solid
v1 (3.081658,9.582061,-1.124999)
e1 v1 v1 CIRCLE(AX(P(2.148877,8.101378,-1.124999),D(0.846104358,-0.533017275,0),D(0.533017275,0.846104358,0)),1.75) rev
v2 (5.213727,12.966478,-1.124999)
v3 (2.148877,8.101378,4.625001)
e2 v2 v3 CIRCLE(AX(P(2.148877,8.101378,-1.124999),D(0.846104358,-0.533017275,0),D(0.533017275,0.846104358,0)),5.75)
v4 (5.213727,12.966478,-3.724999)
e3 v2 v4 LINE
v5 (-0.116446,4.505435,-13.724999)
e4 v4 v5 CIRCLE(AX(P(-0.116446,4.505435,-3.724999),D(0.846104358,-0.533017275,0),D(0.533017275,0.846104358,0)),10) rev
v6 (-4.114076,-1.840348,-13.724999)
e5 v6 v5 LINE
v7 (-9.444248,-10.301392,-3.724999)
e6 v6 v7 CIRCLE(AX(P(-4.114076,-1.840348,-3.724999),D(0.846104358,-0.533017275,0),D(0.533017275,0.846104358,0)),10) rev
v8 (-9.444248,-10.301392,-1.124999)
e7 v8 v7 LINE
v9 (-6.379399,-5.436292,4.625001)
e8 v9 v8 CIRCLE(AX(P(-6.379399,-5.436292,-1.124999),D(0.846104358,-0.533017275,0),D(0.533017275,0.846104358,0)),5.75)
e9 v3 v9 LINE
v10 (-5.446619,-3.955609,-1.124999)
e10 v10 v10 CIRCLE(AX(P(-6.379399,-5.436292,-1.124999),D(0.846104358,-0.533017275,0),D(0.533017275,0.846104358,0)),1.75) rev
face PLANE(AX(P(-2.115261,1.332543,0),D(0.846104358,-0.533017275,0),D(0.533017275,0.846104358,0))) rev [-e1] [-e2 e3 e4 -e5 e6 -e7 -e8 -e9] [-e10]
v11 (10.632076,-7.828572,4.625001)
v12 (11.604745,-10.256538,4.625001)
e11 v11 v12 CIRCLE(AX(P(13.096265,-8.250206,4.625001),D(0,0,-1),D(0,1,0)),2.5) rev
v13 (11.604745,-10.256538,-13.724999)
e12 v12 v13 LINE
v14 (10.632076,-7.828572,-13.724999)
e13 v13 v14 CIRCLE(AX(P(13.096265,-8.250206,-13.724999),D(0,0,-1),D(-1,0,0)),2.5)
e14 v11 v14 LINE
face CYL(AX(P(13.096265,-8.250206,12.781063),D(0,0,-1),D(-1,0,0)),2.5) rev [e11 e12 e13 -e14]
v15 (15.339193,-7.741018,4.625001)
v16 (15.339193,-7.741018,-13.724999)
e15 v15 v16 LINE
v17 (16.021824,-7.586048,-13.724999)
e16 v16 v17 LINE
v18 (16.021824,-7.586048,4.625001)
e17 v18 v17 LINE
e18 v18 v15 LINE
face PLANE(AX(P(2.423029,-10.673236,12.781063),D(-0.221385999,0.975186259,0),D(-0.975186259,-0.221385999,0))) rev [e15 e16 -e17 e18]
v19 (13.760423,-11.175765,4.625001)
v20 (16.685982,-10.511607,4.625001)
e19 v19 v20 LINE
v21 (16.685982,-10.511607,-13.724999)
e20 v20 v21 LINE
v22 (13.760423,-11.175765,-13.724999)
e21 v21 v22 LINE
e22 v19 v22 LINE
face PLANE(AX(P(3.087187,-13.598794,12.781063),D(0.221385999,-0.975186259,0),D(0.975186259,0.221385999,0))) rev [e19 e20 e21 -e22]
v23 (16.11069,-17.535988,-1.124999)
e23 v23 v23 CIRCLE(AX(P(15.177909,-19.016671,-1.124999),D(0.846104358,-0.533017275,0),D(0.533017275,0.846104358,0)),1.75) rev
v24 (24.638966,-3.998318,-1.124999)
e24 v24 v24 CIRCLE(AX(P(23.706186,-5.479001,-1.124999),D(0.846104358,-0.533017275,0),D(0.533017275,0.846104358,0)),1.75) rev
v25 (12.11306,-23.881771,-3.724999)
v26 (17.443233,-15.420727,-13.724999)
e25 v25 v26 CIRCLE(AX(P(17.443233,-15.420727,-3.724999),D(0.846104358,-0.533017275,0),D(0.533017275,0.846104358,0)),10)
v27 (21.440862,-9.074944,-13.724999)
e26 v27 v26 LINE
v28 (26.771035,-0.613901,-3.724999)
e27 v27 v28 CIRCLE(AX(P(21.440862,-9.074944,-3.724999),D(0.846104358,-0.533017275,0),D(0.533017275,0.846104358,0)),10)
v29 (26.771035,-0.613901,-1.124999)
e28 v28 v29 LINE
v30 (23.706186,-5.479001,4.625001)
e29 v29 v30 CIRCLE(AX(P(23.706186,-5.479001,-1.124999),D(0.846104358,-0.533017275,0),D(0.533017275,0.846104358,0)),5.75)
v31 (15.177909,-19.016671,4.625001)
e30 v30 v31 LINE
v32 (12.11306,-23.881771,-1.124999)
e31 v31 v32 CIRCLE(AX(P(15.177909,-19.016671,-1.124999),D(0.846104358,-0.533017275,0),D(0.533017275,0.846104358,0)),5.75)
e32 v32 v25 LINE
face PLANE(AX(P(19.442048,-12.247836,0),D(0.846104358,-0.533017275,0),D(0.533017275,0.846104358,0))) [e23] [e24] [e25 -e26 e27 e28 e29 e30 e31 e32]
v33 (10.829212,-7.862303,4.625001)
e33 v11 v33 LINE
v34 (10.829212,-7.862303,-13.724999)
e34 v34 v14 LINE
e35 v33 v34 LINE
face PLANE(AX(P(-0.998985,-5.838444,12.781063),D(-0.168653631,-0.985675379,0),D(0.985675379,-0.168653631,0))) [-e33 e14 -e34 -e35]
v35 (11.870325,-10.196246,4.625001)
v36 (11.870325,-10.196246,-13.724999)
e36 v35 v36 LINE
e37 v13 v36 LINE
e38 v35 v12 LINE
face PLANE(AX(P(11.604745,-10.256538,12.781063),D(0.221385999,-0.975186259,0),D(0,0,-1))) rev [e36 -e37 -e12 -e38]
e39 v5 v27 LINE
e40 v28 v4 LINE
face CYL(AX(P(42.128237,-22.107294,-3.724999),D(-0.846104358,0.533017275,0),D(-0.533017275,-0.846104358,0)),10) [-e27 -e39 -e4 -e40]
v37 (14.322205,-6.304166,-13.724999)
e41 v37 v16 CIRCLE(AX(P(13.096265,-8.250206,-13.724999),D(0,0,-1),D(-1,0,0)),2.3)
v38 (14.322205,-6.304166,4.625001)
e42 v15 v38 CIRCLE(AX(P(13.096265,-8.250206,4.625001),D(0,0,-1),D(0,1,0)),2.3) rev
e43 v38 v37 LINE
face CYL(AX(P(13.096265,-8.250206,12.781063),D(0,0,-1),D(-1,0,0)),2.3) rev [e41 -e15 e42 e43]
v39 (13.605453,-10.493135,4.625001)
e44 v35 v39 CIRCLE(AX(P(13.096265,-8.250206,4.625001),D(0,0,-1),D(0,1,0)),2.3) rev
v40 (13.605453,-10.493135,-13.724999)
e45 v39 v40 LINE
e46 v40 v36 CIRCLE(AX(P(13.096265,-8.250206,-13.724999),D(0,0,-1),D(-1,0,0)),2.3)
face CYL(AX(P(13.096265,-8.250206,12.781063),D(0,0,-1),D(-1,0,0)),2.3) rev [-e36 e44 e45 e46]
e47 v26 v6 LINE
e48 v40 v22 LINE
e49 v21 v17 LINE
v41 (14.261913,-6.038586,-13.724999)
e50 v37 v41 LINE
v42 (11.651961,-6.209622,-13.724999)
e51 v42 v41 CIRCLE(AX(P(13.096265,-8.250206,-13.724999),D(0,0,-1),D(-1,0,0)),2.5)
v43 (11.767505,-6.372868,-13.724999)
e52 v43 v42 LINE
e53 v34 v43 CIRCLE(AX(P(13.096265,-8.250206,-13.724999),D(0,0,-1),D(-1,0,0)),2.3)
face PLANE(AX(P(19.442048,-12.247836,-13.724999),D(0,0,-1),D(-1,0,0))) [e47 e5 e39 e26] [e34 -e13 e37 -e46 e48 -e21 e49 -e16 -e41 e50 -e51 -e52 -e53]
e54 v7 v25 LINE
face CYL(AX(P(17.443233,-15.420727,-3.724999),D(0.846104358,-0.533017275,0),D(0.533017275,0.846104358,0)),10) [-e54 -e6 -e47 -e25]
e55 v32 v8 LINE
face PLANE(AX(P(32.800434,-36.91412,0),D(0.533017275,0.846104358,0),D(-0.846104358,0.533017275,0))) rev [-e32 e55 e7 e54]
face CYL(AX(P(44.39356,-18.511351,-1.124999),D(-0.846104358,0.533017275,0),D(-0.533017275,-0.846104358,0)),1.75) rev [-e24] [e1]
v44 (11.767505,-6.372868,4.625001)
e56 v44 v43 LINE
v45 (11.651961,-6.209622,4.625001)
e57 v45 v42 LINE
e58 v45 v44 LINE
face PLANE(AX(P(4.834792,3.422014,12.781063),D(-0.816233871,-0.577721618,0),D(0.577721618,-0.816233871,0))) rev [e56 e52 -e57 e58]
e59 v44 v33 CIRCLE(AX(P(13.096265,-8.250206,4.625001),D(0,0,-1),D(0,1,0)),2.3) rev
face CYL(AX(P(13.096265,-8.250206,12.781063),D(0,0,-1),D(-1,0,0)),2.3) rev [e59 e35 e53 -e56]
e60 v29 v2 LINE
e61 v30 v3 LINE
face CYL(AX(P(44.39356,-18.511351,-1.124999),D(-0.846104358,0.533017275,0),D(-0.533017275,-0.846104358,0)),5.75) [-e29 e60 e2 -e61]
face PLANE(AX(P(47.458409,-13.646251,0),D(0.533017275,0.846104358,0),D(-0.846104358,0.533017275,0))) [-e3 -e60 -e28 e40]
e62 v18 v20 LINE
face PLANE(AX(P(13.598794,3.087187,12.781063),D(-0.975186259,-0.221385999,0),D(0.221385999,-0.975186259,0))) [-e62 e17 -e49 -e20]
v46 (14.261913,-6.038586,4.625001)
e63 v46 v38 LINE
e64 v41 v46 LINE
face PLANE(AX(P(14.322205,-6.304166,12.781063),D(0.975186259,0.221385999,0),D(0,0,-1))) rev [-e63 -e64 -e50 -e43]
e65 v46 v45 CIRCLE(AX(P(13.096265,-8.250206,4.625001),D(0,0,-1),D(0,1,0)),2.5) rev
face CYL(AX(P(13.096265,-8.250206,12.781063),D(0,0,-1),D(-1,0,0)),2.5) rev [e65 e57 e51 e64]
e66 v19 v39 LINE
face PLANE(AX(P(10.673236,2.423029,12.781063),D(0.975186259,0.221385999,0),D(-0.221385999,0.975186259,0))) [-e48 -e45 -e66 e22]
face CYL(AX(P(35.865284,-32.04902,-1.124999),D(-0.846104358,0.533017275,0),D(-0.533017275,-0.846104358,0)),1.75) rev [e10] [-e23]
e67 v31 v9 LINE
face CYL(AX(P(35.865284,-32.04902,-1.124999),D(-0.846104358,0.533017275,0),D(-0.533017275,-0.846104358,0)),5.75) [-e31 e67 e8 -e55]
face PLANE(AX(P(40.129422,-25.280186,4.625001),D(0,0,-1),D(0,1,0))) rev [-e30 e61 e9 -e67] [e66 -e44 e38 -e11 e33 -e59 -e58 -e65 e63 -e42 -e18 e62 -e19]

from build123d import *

# Parameters (mm, degrees)
SKETCH1_R           = 1.75
BOSS_EXTRUDE1_DEPTH = 15.478309227
SKETCH2_R           = 1.75
BOSS_EXTRUDE2_DEPTH = 10
SKETCH5_W           = 2.4
SKETCH5_H           = 27.5
CUT_EXTRUDE1_DEPTH  = 15.478309227
CUT_EXTRUDE2_DEPTH  = 18.35
FILLET1_R           = 10
CHAMFER1_SIZE       = 0.2


with BuildPart() as part:
    # Sketch1 → Boss-Extrude1 (new body)
    with BuildSketch(Plane(origin=(-2.115260895, 1.332543188, 0), x_dir=(0, 0, -1), z_dir=(0.8461043578704047, -0.533017275135347, 0))):
        with BuildLine():
            Line((16.124998711, 13.75), (1.124998711, 13.75))
            ThreePointArc((1.124998711, 13.75), (-2.94086528, 12.065863992), (-4.625001289, 8))
            Line((-4.625001289, 8), (-4.625001289, -8))
            ThreePointArc((-4.625001289, -8), (-2.94086528, -12.065863992), (1.124998711, -13.75))
            Line((1.124998711, -13.75), (16.124998711, -13.75))
            Line((16.124998711, -13.75), (16.124998711, 13.75))
        make_face()
        with Locations(Location((1.124998711, 8, 0), (0, 0, 90))):
            Circle(SKETCH1_R, mode=Mode.SUBTRACT)
        with Locations(Location((1.124998711, -8, 0), (0, 0, 90))):
            Circle(SKETCH1_R, mode=Mode.SUBTRACT)
    extrude(amount=BOSS_EXTRUDE1_DEPTH)

    # Sketch2 → Boss-Extrude2 (add)
    with BuildSketch(Plane(origin=(10.981003995, -6.91766302, 0), x_dir=(0, 0, -1), z_dir=(0.8461043578704048, -0.5330172751353467, 0))):
        with BuildLine():
            ThreePointArc((-4.625001289, -8), (-2.94086528, -12.065863992), (1.124998711, -13.75))
            Line((1.124998711, -13.75), (13.724998711, -13.75))
            Line((13.724998711, -13.75), (13.724998711, -2.9))
            Line((13.724998711, -2.9), (13.724998711, 0))
            Line((13.724998711, 0), (13.724998711, 2.9))
            Line((13.724998711, 2.9), (13.724998711, 13.75))
            Line((13.724998711, 13.75), (1.124998711, 13.75))
            ThreePointArc((1.124998711, 13.75), (-2.94086528, 12.065863992), (-4.625001289, 8))
            Line((-4.625001289, 8), (-4.625001289, -8))
        make_face()
        with Locations((1.124998711, -8)):
            Circle(SKETCH2_R, mode=Mode.SUBTRACT)
        with Locations((1.124998711, 8)):
            Circle(SKETCH2_R, mode=Mode.SUBTRACT)
    extrude(amount=BOSS_EXTRUDE2_DEPTH)

    # Sketch5 → Cut-Extrude1 (cut)
    with BuildSketch(Plane(origin=(10.981003995, -6.91766302, 0), x_dir=(0, 0, -1), z_dir=(0.8461043578704048, -0.5330172751353467, 0))):
        with Locations((14.924998711, 0)):
            Rectangle(SKETCH5_W, SKETCH5_H)
    extrude(amount=-CUT_EXTRUDE1_DEPTH, mode=Mode.SUBTRACT)

    # Sketch7 → Cut-Extrude2 (cut)
    with BuildSketch(Plane(origin=(0, 0, -13.724998711), x_dir=(-1, 0, 0), z_dir=(0, 0, -1))):
        with BuildLine():
            Line((-16.021823666, -7.58604821), (-16.685981664, -10.511606986))
            Line((-16.685981664, -10.511606986), (-13.760422887, -11.175764984))
            ThreePointArc((-13.760422887, -11.175764984), (-15.634577963, -9.849258033), (-16.021823666, -7.58604821))
        make_face()
        with BuildLine():
            ThreePointArc((-16.021823666, -7.58604821), (-15.634577963, -9.849258033), (-13.760422887, -11.175764984))
            Line((-13.760422887, -11.175764984), (-13.649729888, -10.688171855))
            ThreePointArc((-13.649729888, -10.688171855), (-15.211525784, -9.582749396), (-15.534230536, -7.69674121))
            Line((-15.534230536, -7.69674121), (-16.021823666, -7.58604821))
        make_face()
        with BuildLine():
            ThreePointArc((-15.534230536, -7.69674121), (-15.211525784, -9.582749396), (-13.649729888, -10.688171855))
            Line((-13.649729888, -10.688171855), (-13.605452688, -10.493134603))
            ThreePointArc((-13.605452688, -10.493134603), (-15.042304913, -9.476145941), (-15.339193285, -7.741018409))
            Line((-15.339193285, -7.741018409), (-15.534230536, -7.69674121))
        make_face()
        with BuildLine():
            ThreePointArc((-15.339193285, -7.741018409), (-15.042304913, -9.476145941), (-13.605452688, -10.493134603))
            Line((-13.605452688, -10.493134603), (-13.096264889, -8.250206208))
            Line((-13.096264889, -8.250206208), (-15.339193285, -7.741018409))
        make_face()
        with BuildLine():
            Line((-13.096264889, -8.250206208), (-13.605452688, -10.493134603))
            ThreePointArc((-13.605452688, -10.493134603), (-12.708361538, -10.517259579), (-11.870325157, -10.196246231))
            Line((-11.870325157, -10.196246231), (-13.096264889, -8.250206208))
        make_face()
        with BuildLine():
            ThreePointArc((-14.322204622, -6.304166185), (-14.973602792, -6.921446486), (-15.339193285, -7.741018409))
            Line((-15.339193285, -7.741018409), (-13.096264889, -8.250206208))
            Line((-13.096264889, -8.250206208), (-14.322204622, -6.304166185))
        make_face()
        with BuildLine():
            Line((-10.829211518, -7.862302856), (-13.096264889, -8.250206208))
            Line((-13.096264889, -8.250206208), (-11.870325157, -10.196246231))
            ThreePointArc((-11.870325157, -10.196246231), (-11.082603872, -9.361587919), (-10.796264889, -8.250206208))
            ThreePointArc((-10.796264889, -8.250206208), (-10.804516348, -8.055556207), (-10.829211518, -7.862302856))
        make_face()
        with BuildLine():
            Line((-11.870325157, -10.196246231), (-11.763721702, -10.365467103))
            ThreePointArc((-11.763721702, -10.365467103), (-10.907502914, -9.458229807), (-10.596264889, -8.250206208))
            ThreePointArc((-10.596264889, -8.250206208), (-10.605233866, -8.038630121), (-10.632076442, -7.82857213))
            Line((-10.632076442, -7.82857213), (-10.829211518, -7.862302856))
            ThreePointArc((-10.829211518, -7.862302856), (-10.804516348, -8.055556207), (-10.796264889, -8.250206208))
            ThreePointArc((-10.796264889, -8.250206208), (-11.082603872, -9.361587919), (-11.870325157, -10.196246231))
        make_face()
        with BuildLine():
            Line((-14.322204622, -6.304166185), (-13.096264889, -8.250206208))
            Line((-13.096264889, -8.250206208), (-11.767505167, -6.372868305))
            ThreePointArc((-11.767505167, -6.372868305), (-13.034434615, -5.951037441), (-14.322204622, -6.304166185))
        make_face()
        with BuildLine():
            ThreePointArc((-11.651960844, -6.209621531), (-13.029058069, -5.751109722), (-14.428808077, -6.134945313))
            Line((-14.428808077, -6.134945313), (-14.322204622, -6.304166185))
            ThreePointArc((-14.322204622, -6.304166185), (-13.034434615, -5.951037441), (-11.767505167, -6.372868305))
            Line((-11.767505167, -6.372868305), (-11.651960844, -6.209621531))
        make_face()
        with BuildLine():
            Line((-11.767505167, -6.372868305), (-13.096264889, -8.250206208))
            Line((-13.096264889, -8.250206208), (-10.829211518, -7.862302856))
            ThreePointArc((-10.829211518, -7.862302856), (-11.150224866, -7.024266475), (-11.767505167, -6.372868305))
        make_face()
    extrude(amount=-CUT_EXTRUDE2_DEPTH, mode=Mode.SUBTRACT)

    # Fillet1
    fillet1_edges = [part.edges().sort_by_distance(p)[0] for p in [
        (1.334405806, -17.091581212, -13.724998711),
        (15.992380872, 6.176288629, -13.724998711),
    ]]
    fillet(fillet1_edges, radius=FILLET1_R)

    # Chamfer1
    # the kernel refuses this chamfer: 0.2 mm, written as the material it adds along each edge
    with BuildSketch(Plane(origin=(14.428808077, -6.134945313, -13.724998711), x_dir=(-0.533017275135546, -0.8461043578702794, 0), z_dir=(0, 0, 1))) as chamfer1_piece_1_section:
        with BuildLine():
            Line((CHAMFER1_SIZE, 0), (0.007427842, -0.192572158))
            ThreePointArc((0.007427842, -0.192572158), (0.001963813, -0.09907174), (0, 0))
            Line((0, 0), (CHAMFER1_SIZE, 0))
        make_face()
    chamfer1_piece_1 = extrude(amount=18.35, mode=Mode.PRIVATE)
    chamfer1_piece_1 = chamfer1_piece_1 - Plane(origin=(13.096264889, -8.250206208, -13.724998711), x_dir=(0.5330172751353905, 0.8461043578703773, 0), z_dir=(0, 0, -1)) * Cylinder(2.3, 38, mode=Mode.PRIVATE)
    add(chamfer1_piece_1)
    with BuildSketch(Plane(origin=(11.763721702, -10.365467103, -13.724998711), x_dir=(-0.8249315284266814, 0.5652326719215895, 0), z_dir=(0, 0, 1))) as chamfer1_piece_2_section:
        with BuildLine():
            Line((0.192715357, 0), (CHAMFER1_SIZE * 0.0385430714682, -CHAMFER1_SIZE * 0.999256939752))
            Line((CHAMFER1_SIZE * 0.0385430714682, -CHAMFER1_SIZE * 0.999256939752), (0, 0))
            ThreePointArc((0, 0), (0.099073815, 0.001856175), (0.192715357, 0))
        make_face()
    chamfer1_piece_2 = extrude(amount=18.35, mode=Mode.PRIVATE)
    chamfer1_piece_2 = chamfer1_piece_2 - Plane(origin=(13.096264889, -8.250206208, -13.724998711), x_dir=(0.22138599930385242, -0.9751862587794369, 0), z_dir=(0, 0, -1)) * Cylinder(2.3, 38, mode=Mode.PRIVATE)
    add(chamfer1_piece_2)


solid = part.part
